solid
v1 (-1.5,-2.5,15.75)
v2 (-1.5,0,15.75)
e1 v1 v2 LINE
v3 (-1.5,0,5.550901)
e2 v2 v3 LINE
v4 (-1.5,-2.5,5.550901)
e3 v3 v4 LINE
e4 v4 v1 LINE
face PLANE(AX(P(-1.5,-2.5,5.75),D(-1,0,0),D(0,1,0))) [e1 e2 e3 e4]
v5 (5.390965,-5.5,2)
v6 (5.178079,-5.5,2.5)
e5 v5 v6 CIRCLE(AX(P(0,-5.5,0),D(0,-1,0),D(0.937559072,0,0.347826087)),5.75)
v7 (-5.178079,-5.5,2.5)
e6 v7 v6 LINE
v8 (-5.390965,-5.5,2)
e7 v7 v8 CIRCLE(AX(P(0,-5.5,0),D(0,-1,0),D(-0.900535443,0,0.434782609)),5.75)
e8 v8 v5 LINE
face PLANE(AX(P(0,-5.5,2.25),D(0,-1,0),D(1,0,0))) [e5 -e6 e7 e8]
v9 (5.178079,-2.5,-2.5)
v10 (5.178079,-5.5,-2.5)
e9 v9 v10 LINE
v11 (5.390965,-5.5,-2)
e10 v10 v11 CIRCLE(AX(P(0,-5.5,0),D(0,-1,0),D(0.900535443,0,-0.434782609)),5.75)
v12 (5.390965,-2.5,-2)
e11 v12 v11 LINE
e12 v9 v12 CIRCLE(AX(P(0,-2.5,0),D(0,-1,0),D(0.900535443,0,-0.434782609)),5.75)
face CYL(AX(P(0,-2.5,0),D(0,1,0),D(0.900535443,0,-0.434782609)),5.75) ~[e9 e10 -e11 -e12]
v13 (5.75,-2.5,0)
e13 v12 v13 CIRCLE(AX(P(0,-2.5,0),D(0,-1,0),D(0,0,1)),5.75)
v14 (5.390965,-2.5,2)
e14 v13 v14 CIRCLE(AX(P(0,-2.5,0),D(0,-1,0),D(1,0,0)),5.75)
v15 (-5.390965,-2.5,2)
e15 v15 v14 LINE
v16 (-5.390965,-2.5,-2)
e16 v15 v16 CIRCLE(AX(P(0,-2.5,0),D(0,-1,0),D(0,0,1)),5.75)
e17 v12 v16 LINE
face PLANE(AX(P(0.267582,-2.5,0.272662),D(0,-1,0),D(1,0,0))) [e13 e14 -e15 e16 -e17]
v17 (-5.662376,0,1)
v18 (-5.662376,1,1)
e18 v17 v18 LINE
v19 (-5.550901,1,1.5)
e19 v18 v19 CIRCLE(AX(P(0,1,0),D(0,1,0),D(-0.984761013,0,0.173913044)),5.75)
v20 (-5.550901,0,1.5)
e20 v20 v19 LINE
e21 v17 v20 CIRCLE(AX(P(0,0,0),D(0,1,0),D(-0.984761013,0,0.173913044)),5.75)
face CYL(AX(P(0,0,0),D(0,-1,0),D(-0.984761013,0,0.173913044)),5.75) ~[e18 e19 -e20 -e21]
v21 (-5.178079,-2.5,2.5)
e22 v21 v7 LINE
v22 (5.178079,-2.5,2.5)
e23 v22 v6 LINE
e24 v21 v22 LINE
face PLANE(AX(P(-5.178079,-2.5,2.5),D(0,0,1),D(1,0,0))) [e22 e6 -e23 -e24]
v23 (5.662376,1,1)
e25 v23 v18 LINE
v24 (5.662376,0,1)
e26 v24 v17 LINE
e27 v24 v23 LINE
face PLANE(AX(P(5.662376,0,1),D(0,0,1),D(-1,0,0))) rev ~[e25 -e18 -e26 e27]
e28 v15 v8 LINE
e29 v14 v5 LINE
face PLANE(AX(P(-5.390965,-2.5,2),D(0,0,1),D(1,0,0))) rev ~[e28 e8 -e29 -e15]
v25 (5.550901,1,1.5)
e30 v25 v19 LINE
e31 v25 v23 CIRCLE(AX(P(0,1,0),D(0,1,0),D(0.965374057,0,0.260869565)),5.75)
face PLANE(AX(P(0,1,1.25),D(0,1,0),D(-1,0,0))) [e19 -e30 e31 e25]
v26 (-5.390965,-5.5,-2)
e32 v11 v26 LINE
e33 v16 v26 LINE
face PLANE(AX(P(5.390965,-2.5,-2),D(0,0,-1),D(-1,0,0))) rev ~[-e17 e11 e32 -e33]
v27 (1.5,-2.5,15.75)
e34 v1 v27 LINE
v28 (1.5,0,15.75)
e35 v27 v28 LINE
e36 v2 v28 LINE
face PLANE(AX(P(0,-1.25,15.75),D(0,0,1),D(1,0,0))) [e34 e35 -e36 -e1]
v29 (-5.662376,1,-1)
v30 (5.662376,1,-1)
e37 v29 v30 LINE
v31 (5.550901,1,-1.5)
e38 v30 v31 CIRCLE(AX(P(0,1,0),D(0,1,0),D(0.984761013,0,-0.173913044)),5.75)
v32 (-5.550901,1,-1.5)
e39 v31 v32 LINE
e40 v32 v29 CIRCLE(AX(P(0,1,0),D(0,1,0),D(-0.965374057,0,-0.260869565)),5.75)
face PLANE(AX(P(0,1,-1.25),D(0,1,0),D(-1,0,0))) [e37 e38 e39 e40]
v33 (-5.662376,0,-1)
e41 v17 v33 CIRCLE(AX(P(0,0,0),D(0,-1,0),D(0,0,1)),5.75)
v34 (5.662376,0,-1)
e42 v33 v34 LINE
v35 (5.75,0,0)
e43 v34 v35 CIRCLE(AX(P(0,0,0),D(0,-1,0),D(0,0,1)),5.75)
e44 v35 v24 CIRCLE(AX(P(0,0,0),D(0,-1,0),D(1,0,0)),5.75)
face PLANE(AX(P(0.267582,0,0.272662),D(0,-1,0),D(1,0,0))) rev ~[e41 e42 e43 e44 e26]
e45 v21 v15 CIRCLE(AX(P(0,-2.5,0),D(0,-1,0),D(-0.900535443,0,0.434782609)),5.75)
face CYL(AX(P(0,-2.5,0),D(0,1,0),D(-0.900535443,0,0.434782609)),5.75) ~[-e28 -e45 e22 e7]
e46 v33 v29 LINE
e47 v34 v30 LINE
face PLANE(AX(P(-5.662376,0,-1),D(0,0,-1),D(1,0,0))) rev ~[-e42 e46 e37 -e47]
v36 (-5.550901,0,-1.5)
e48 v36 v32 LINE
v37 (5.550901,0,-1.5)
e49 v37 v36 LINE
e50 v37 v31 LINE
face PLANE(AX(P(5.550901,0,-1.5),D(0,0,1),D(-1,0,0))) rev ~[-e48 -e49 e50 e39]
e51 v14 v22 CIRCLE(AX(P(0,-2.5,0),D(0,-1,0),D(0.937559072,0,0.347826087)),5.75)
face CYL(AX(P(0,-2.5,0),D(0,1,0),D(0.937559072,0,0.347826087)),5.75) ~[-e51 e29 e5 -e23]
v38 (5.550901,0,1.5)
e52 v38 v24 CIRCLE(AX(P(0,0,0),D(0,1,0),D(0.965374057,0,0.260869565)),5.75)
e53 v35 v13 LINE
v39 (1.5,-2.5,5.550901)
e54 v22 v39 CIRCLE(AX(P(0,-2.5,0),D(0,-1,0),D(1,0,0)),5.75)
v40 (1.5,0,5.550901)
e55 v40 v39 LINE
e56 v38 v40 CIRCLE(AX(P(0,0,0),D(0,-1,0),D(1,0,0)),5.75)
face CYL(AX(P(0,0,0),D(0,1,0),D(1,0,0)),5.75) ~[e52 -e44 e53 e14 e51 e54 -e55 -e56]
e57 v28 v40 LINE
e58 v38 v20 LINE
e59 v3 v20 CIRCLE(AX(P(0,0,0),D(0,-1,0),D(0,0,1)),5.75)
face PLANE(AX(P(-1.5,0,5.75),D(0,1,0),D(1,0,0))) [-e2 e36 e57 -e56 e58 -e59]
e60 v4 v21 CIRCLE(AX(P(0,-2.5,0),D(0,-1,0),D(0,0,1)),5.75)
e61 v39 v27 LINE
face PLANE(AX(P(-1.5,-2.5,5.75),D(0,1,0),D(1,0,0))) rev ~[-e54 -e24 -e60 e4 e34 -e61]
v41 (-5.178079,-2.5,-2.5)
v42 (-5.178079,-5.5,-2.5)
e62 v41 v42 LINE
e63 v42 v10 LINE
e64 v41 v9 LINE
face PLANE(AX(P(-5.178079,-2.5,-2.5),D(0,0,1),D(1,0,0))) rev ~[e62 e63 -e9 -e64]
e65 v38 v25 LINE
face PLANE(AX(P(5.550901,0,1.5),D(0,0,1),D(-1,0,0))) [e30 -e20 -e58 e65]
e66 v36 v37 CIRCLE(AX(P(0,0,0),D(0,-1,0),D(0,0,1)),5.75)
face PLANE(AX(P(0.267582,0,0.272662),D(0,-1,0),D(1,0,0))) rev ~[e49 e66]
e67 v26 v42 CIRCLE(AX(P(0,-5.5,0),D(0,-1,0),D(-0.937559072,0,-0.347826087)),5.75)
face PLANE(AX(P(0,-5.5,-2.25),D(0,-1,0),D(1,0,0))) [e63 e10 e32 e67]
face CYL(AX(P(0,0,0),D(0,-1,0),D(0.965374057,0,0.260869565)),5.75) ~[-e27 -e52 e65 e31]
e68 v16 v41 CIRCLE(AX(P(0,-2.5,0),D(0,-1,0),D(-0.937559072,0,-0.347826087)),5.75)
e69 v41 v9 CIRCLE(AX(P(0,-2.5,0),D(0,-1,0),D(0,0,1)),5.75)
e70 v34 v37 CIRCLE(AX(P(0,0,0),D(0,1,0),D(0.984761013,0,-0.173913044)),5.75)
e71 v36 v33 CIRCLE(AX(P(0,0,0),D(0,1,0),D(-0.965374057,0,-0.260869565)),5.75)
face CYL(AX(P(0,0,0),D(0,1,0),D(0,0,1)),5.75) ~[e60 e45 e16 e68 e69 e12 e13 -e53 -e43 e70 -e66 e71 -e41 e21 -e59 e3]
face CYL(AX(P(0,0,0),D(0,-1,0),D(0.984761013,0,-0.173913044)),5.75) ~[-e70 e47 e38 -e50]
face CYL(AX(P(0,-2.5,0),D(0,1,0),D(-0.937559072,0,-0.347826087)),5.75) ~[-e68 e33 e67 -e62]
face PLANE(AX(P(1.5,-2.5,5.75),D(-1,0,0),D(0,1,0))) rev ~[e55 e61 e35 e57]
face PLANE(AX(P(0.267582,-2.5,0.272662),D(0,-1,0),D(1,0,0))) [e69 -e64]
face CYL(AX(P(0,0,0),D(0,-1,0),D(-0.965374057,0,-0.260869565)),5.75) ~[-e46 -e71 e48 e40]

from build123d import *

# Parameters (mm, degrees)
F1_DEPTH = 2.5
F2_W     = 10.3561575886
F2_H     = 0.5
F3_DEPTH = 3
F4_W     = 11.1018016556
F4_H     = 0.5
F5_DEPTH = 1
F6_DEPTH = 2.5
F7_W     = 3
F7_H     = 2.5
F8_DEPTH = 10


# Not quite as in the source:
# - after a boolean that leaves OpenCascade's solid faulty, fix() repairs it


with BuildPart() as f1:
    # F0 (on Front) → F1 (new body)
    with BuildSketch(Plane.XZ):
        with BuildLine():
            ThreePointArc((-1.5, 5.5509008278), (-3.4955328635, -4.5654955919), (5.75, 0))
            ThreePointArc((5.75, 0), (4.5654955919, 3.4955328635), (1.5, 5.5509008278))
            ThreePointArc((1.5, 5.5509008278), (0.7565779009, 5.7000078842), (0, 5.75))
            ThreePointArc((0, 5.75), (-0.7565779009, 5.7000078842), (-1.5, 5.5509008278))
        make_face()
    extrude(amount=F1_DEPTH)

    # F2 (on face) → F3 (join)
    with BuildSketch(Plane.XZ.offset(2.5)):
        with Locations((0, 2.25)):
            Rectangle(F2_W, F2_H)
        with Locations((0, -2.25)):
            Rectangle(F2_W, F2_H)
        with BuildLine():
            Line((5.1780787943, 2.5), (5.1780787943, 2))
            Line((5.1780787943, 2), (5.3909646632, 2))
            ThreePointArc((5.3909646632, 2), (5.2904319201, 2.2525163925), (5.1780787943, 2.5))
        make_face()
        with BuildLine():
            ThreePointArc((-5.1780787943, 2.5), (-5.2904319201, 2.2525163925), (-5.3909646632, 2))
            Line((-5.3909646632, 2), (-5.1780787943, 2))
            Line((-5.1780787943, 2), (-5.1780787943, 2.5))
        make_face()
        with BuildLine():
            Line((-5.1780787943, -2), (-5.3909646632, -2))
            ThreePointArc((-5.3909646632, -2), (-5.2904319201, -2.2525163925), (-5.1780787943, -2.5))
            Line((-5.1780787943, -2.5), (-5.1780787943, -2))
        make_face()
        with BuildLine():
            Line((5.3909646632, -2), (5.1780787943, -2))
            Line((5.1780787943, -2), (5.1780787943, -2.5))
            ThreePointArc((5.1780787943, -2.5), (5.2904319201, -2.2525163925), (5.3909646632, -2))
        make_face()
    extrude(amount=F3_DEPTH)

    # F4 (on face) → F5 (join)
    with BuildSketch(Plane(origin=(0, 0, 0), x_dir=(-1, 0, 0), z_dir=(0, 1, 0))):
        with Locations((0, 1.25)):
            Rectangle(F4_W, F4_H)
        with Locations((0, -1.25)):
            Rectangle(F4_W, F4_H)
        with BuildLine():
            Line((5.5509008278, 1.5), (5.5509008278, 1))
            Line((5.5509008278, 1), (5.6623758265, 1))
            ThreePointArc((5.6623758265, 1), (5.6122093093, 1.2512420505), (5.5509008278, 1.5))
        make_face()
        with BuildLine():
            Line((5.6623758265, -1), (5.5509008278, -1))
            Line((5.5509008278, -1), (5.5509008278, -1.5))
            ThreePointArc((5.5509008278, -1.5), (5.6122093093, -1.2512420505), (5.6623758265, -1))
        make_face()
        with BuildLine():
            Line((-5.5509008278, -1), (-5.6623758265, -1))
            ThreePointArc((-5.6623758265, -1), (-5.6122093093, -1.2512420505), (-5.5509008278, -1.5))
            Line((-5.5509008278, -1.5), (-5.5509008278, -1))
        make_face()
        with BuildLine():
            ThreePointArc((-5.5509008278, 1.5), (-5.6122093093, 1.2512420505), (-5.6623758265, 1))
            Line((-5.6623758265, 1), (-5.5509008278, 1))
            Line((-5.5509008278, 1), (-5.5509008278, 1.5))
        make_face()
    extrude(amount=F5_DEPTH)

    add(f1.part.fix(), mode=Mode.REPLACE)

    # F0 (on Front) → F6 (join)
    with BuildSketch(Plane.XZ):
        with BuildLine():
            ThreePointArc((0, 5.75), (0.7565779009, 5.7000078842), (1.5, 5.5509008278))
            Line((1.5, 5.5509008278), (1.5, 5.75))
            Line((1.5, 5.75), (0, 5.75))
        make_face()
        with BuildLine():
            Line((-1.5, 5.75), (-1.5, 5.5509008278))
            ThreePointArc((-1.5, 5.5509008278), (-0.7565779009, 5.7000078842), (0, 5.75))
            Line((0, 5.75), (-1.5, 5.75))
        make_face()
    extrude(amount=F6_DEPTH)

    # F7 (on face) → F8 (join)
    with BuildSketch(Plane.XY.offset(5.75)):
        with Locations((0, -1.25)):
            Rectangle(F7_W, F7_H)
    extrude(amount=F8_DEPTH)


solid = f1.part
